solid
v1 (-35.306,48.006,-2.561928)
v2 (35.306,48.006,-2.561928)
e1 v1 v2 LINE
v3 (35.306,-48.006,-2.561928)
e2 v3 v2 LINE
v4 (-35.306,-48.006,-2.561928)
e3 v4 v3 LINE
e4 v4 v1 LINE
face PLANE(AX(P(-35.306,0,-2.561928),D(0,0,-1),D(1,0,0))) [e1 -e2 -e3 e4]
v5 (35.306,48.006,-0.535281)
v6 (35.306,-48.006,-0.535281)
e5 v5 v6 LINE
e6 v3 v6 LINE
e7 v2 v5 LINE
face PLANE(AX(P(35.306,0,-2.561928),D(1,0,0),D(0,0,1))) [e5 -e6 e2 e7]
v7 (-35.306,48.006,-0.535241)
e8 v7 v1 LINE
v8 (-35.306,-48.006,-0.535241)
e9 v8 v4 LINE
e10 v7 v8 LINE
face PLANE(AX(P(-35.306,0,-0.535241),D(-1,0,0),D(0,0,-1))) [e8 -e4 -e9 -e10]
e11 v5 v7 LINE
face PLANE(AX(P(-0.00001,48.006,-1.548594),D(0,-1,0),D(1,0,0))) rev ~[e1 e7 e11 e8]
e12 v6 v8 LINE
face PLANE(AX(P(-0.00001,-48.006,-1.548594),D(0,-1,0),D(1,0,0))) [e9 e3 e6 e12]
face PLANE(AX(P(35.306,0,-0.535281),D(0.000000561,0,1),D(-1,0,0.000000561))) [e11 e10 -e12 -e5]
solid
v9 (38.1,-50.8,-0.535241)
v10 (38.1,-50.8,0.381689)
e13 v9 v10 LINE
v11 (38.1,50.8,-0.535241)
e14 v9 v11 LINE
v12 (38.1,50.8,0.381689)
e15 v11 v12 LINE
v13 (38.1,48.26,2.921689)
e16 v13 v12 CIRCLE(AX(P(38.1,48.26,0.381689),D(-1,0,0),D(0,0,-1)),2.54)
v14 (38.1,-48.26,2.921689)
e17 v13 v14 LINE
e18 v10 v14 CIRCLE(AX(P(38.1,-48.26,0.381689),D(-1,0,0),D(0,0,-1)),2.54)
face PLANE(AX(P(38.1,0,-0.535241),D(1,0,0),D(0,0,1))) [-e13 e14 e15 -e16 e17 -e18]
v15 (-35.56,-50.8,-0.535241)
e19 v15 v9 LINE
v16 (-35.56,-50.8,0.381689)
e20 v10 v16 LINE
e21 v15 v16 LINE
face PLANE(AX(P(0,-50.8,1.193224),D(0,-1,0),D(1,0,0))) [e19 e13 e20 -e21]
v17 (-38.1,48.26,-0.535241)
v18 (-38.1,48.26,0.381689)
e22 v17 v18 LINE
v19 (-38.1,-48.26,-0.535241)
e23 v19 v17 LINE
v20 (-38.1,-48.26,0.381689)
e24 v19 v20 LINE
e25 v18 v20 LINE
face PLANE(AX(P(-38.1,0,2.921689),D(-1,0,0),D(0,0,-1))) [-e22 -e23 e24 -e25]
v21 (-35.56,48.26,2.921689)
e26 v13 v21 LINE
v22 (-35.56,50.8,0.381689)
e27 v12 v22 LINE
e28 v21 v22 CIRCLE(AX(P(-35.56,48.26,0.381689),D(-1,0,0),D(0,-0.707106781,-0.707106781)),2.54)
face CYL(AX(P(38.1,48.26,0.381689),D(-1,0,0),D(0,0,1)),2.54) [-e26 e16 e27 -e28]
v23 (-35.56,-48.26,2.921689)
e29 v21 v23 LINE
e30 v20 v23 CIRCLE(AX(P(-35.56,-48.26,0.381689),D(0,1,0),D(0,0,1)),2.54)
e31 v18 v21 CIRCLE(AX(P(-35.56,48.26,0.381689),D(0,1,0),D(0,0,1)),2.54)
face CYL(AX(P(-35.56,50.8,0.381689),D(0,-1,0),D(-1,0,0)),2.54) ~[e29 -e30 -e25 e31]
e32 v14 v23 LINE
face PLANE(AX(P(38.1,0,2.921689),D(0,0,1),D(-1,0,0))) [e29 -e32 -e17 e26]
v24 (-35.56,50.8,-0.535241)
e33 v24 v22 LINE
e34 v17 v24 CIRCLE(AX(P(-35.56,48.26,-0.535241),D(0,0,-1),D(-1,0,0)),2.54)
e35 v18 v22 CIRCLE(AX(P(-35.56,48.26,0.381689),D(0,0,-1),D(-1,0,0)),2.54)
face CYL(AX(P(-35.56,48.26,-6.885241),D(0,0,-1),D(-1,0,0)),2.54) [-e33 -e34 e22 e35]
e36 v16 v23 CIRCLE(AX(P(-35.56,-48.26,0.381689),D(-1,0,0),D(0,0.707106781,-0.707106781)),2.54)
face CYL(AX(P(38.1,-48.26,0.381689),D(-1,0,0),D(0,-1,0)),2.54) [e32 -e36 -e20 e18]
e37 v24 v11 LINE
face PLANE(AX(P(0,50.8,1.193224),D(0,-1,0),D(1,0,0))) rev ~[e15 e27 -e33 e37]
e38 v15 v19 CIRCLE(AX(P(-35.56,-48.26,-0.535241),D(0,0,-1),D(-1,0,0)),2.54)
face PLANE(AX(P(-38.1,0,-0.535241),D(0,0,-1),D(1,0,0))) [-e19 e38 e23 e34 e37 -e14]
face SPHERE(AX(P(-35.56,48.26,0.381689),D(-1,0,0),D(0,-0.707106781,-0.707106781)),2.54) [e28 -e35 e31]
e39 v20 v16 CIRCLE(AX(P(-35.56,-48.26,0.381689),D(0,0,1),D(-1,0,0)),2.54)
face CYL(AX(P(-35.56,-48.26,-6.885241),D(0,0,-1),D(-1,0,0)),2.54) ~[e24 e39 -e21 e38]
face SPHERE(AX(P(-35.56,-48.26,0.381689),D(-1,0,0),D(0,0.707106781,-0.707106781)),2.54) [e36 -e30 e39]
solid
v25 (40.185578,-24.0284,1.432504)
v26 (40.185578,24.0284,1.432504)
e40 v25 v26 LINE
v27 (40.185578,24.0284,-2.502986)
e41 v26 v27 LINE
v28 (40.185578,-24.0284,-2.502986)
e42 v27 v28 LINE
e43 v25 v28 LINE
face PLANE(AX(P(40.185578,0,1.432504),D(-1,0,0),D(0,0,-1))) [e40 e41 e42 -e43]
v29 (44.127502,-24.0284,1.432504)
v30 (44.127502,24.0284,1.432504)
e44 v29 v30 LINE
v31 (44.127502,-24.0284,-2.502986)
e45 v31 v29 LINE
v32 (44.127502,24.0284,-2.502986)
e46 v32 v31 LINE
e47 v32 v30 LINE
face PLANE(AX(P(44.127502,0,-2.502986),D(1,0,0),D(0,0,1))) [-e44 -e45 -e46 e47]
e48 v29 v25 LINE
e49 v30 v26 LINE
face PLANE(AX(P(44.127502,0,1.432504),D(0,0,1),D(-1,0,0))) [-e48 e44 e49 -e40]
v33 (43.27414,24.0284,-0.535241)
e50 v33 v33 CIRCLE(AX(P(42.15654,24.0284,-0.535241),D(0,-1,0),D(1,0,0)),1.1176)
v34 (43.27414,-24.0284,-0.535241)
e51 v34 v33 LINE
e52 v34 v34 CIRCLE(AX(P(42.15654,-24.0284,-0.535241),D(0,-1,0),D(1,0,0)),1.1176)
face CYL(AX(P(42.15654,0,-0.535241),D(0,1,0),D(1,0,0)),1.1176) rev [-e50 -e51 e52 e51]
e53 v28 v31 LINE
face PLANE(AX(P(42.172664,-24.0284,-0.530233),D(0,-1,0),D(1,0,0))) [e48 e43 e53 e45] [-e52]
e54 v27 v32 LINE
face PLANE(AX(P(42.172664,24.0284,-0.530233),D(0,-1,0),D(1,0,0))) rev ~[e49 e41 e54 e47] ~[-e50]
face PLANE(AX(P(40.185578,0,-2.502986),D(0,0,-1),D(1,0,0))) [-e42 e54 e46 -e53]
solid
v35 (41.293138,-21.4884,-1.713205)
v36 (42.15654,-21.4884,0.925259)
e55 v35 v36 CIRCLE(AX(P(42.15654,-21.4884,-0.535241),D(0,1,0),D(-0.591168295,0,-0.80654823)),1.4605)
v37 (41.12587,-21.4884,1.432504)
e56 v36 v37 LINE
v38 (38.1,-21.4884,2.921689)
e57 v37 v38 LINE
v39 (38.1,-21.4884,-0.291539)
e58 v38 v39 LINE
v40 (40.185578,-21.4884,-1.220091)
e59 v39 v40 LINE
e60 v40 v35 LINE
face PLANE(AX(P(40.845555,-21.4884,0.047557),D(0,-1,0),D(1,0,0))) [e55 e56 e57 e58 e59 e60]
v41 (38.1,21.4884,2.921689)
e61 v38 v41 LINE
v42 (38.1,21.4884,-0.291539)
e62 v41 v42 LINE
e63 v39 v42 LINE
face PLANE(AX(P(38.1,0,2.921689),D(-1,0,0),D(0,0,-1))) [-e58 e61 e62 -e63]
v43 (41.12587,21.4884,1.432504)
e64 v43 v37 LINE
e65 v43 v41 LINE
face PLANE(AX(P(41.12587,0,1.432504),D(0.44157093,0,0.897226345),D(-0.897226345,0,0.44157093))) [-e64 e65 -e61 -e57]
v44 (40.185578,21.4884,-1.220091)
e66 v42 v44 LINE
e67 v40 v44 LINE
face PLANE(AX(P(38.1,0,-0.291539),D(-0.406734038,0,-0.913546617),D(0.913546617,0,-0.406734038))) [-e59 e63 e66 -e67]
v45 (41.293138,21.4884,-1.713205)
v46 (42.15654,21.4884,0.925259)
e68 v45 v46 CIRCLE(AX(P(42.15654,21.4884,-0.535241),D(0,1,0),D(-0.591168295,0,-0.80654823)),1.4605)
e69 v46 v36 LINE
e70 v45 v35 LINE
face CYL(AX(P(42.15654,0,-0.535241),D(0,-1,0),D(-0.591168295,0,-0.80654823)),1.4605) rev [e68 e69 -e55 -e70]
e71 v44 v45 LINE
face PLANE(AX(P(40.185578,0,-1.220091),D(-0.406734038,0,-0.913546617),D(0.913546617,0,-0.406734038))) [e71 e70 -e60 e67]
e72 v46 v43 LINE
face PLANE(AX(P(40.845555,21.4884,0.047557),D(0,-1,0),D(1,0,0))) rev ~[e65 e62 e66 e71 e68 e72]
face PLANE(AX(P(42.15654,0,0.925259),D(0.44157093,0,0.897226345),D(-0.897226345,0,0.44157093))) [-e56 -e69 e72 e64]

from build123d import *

# Parameters (mm, degrees)
F1_DEPTH     = 50.8
F2_DEPTH     = 48.006
F3_R         = 2.54
F4_T1_DEPTH  = 7.2669304909
F4_S5_W      = 2.54
F4_S5_H      = 2.54
F4_T6_DEPTH  = 2.54
F4_S11_W     = 2.54
F4_S11_H     = 2.54
F4_T12_DEPTH = 2.54
F0_R         = 1.1176
F5_DEPTH     = 24.0284
F6_DEPTH     = 21.4884


# Not quite as in the source:
# - a fillet or chamfer that OpenCascade refuses, or shapes differently, is made with other operations: its cross-section is extruded or revolved along the edge and cut away or added
# - ends of sketch curves that miss each other by under 0.0002 mm in the source are joined


with BuildPart() as f1:
    # F0 (on Front) → F1 (new body, symmetric)
    with BuildSketch(Plane.XZ):
        Polygon((35.306, -0.5352410823), (38.1, -0.5352410823), (38.1, -0.2915388458), (38.1, 2.9216894086), (-38.1, 2.9216894086), (-38.1, -0.5352410823), (-35.306, -0.5352410823), align=None)
    extrude(amount=F1_DEPTH, both=True)

    # F3
    f3_edges = [f1.edges().sort_by_distance(p)[0] for p in [
        (0, 50.8, 2.921689),
        (-38.1, 0, 2.921689),
        (0, -50.8, 2.921689),
    ]]
    fillet(f3_edges, radius=F3_R)

    # F4: fillet of radius 2.54 on 4 edges, made by hand

    # F4_s2 → F4_t1 (cut)
    with BuildSketch(Plane.XY.offset(-6.8852410823)):
        with BuildLine():
            ThreePointArc((-38.1, 48.26), (-37.3560512242, 50.0560512242), (-35.56, 50.8))
            Line((-35.56, 50.8), (-38.1, 50.8))
            Line((-38.1, 50.8), (-38.1, 48.26))
        make_face()
        with BuildLine():
            ThreePointArc((-38.1, -48.26), (-37.3560512242, -50.0560512242), (-35.56, -50.8))
            Line((-35.56, -50.8), (-38.1, -50.8))
            Line((-38.1, -50.8), (-38.1, -48.26))
        make_face()
    extrude(amount=F4_T1_DEPTH, mode=Mode.SUBTRACT)


with BuildPart() as f2:
    # F0 (on Front) → F2 (new body, symmetric)
    with BuildSketch(Plane.XZ):
        Polygon((35.306, -2.5619280059), (35.306, -0.5352806766), (-35.306, -0.5352410823), (-35.306, -2.5619280059), align=None)
    extrude(amount=F2_DEPTH, both=True)


with BuildPart() as f4_tool4:
    # F4_s5 → F4_t6 (new body)
    with BuildSketch(Plane.YZ.offset(-35.56)):
        with Locations((49.53, 1.6516894086)):
            Rectangle(F4_S5_W, F4_S5_H)
    extrude(amount=-F4_T6_DEPTH)

    # F4_s7 → F4_t8 (revolve, cut)
    with BuildSketch(Plane(origin=(-35.56, 48.26, 0.3816894086), x_dir=(0, -0.7071067812, -0.7071067812), z_dir=(0, 0.7071067812, -0.7071067812))):
        with BuildLine():
            ThreePointArc((0, -2.54), (2.54, 0), (0, 2.54))
            Line((0, 2.54), (0, -2.54))
        make_face()
    revolve(axis=Axis((-35.56, 48.26, 0.3816894086), (-1, 0, 0)), mode=Mode.SUBTRACT)


with BuildPart() as f1_1:
    add(f1.part)

    # F4_t3: cut F4_tool4
    add(f4_tool4.part, mode=Mode.SUBTRACT)


with BuildPart() as f4_tool10:
    # F4_s11 → F4_t12 (new body)
    with BuildSketch(Plane.YZ.offset(-35.56)):
        with Locations((-49.53, 1.6516894086)):
            Rectangle(F4_S11_W, F4_S11_H)
    extrude(amount=-F4_T12_DEPTH)

    # F4_s13 → F4_t14 (revolve, cut)
    with BuildSketch(Plane(origin=(-35.56, -48.26, 0.3816894086), x_dir=(0, 0.7071067812, -0.7071067812), z_dir=(0, 0.7071067812, 0.7071067812))):
        with BuildLine():
            ThreePointArc((0, -2.54), (2.54, 0), (0, 2.54))
            Line((0, 2.54), (0, -2.54))
        make_face()
    revolve(axis=Axis((-35.56, -48.26, 0.3816894086), (-1, 0, 0)), mode=Mode.SUBTRACT)


with BuildPart() as f1_2:
    add(f1_1.part)

    # F4_t9: cut F4_tool10
    add(f4_tool10.part, mode=Mode.SUBTRACT)


with BuildPart() as f5:
    # F0 (on Front) → F5 (new body, symmetric)
    with BuildSketch(Plane.XZ):
        with BuildLine():
            ThreePointArc((42.156539749, 0.9252589177), (40.7684698267, -0.0810141116), (41.2931384536, -1.7132047715))
            ThreePointArc((41.2931384536, -1.7132047715), (42.8168664325, -1.8379417083), (43.617039749, -0.5352410823))
            ThreePointArc((43.617039749, -0.5352410823), (43.1892692029, 0.4974883716), (42.156539749, 0.9252589177))
        make_face()
        with Locations((42.156539749, -0.5352410823)):
            Circle(F0_R, mode=Mode.SUBTRACT)
        with BuildLine():
            Line((40.1855779506, 1.4325042982), (40.1855779506, -1.2200908491))
            Line((40.1855779506, -1.2200908491), (41.2931384536, -1.7132047715))
            ThreePointArc((41.2931384536, -1.7132047715), (40.7684698267, -0.0810141116), (42.156539749, 0.9252589177))
            Line((42.156539749, 0.9252589177), (41.1258697318, 1.4325042982))
            Line((41.1258697318, 1.4325042982), (40.1855779506, 1.4325042982))
        make_face()
        with BuildLine():
            Line((41.2931384536, -1.7132047715), (40.1855779506, -1.2200908491))
            Line((40.1855779506, -1.2200908491), (40.1855779506, -2.5029864628))
            Line((40.1855779506, -2.5029864628), (44.1275015473, -2.5029864628))
            Line((44.1275015473, -2.5029864628), (44.1275015473, 1.4325042982))
            Line((44.1275015473, 1.4325042982), (41.1258697318, 1.4325042982))
            Line((41.1258697318, 1.4325042982), (42.156539749, 0.9252589177))
            ThreePointArc((42.156539749, 0.9252589177), (43.1892692029, 0.4974883716), (43.617039749, -0.5352410823))
            ThreePointArc((43.617039749, -0.5352410823), (42.8168664325, -1.8379417083), (41.2931384536, -1.7132047715))
        make_face()
    extrude(amount=F5_DEPTH, both=True)


with BuildPart() as f6:
    # F0 (on Front) → F6 (new body, symmetric)
    with BuildSketch(Plane.XZ):
        with BuildLine():
            Line((40.1855779506, 1.4325042982), (40.1855779506, -1.2200908491))
            Line((40.1855779506, -1.2200908491), (41.2931384536, -1.7132047715))
            ThreePointArc((41.2931384536, -1.7132047715), (40.7684698267, -0.0810141116), (42.156539749, 0.9252589177))
            Line((42.156539749, 0.9252589177), (41.1258697318, 1.4325042982))
            Line((41.1258697318, 1.4325042982), (40.1855779506, 1.4325042982))
        make_face()
        Polygon((38.1, 2.9216894086), (38.1, -0.2915388458), (40.1855779506, -1.2200908491), (40.1855779506, 1.4325042982), (41.1258697318, 1.4325042982), align=None)
    extrude(amount=F6_DEPTH, both=True)


solid = Compound([f2.part, f1_2.part, f5.part, f6.part])
